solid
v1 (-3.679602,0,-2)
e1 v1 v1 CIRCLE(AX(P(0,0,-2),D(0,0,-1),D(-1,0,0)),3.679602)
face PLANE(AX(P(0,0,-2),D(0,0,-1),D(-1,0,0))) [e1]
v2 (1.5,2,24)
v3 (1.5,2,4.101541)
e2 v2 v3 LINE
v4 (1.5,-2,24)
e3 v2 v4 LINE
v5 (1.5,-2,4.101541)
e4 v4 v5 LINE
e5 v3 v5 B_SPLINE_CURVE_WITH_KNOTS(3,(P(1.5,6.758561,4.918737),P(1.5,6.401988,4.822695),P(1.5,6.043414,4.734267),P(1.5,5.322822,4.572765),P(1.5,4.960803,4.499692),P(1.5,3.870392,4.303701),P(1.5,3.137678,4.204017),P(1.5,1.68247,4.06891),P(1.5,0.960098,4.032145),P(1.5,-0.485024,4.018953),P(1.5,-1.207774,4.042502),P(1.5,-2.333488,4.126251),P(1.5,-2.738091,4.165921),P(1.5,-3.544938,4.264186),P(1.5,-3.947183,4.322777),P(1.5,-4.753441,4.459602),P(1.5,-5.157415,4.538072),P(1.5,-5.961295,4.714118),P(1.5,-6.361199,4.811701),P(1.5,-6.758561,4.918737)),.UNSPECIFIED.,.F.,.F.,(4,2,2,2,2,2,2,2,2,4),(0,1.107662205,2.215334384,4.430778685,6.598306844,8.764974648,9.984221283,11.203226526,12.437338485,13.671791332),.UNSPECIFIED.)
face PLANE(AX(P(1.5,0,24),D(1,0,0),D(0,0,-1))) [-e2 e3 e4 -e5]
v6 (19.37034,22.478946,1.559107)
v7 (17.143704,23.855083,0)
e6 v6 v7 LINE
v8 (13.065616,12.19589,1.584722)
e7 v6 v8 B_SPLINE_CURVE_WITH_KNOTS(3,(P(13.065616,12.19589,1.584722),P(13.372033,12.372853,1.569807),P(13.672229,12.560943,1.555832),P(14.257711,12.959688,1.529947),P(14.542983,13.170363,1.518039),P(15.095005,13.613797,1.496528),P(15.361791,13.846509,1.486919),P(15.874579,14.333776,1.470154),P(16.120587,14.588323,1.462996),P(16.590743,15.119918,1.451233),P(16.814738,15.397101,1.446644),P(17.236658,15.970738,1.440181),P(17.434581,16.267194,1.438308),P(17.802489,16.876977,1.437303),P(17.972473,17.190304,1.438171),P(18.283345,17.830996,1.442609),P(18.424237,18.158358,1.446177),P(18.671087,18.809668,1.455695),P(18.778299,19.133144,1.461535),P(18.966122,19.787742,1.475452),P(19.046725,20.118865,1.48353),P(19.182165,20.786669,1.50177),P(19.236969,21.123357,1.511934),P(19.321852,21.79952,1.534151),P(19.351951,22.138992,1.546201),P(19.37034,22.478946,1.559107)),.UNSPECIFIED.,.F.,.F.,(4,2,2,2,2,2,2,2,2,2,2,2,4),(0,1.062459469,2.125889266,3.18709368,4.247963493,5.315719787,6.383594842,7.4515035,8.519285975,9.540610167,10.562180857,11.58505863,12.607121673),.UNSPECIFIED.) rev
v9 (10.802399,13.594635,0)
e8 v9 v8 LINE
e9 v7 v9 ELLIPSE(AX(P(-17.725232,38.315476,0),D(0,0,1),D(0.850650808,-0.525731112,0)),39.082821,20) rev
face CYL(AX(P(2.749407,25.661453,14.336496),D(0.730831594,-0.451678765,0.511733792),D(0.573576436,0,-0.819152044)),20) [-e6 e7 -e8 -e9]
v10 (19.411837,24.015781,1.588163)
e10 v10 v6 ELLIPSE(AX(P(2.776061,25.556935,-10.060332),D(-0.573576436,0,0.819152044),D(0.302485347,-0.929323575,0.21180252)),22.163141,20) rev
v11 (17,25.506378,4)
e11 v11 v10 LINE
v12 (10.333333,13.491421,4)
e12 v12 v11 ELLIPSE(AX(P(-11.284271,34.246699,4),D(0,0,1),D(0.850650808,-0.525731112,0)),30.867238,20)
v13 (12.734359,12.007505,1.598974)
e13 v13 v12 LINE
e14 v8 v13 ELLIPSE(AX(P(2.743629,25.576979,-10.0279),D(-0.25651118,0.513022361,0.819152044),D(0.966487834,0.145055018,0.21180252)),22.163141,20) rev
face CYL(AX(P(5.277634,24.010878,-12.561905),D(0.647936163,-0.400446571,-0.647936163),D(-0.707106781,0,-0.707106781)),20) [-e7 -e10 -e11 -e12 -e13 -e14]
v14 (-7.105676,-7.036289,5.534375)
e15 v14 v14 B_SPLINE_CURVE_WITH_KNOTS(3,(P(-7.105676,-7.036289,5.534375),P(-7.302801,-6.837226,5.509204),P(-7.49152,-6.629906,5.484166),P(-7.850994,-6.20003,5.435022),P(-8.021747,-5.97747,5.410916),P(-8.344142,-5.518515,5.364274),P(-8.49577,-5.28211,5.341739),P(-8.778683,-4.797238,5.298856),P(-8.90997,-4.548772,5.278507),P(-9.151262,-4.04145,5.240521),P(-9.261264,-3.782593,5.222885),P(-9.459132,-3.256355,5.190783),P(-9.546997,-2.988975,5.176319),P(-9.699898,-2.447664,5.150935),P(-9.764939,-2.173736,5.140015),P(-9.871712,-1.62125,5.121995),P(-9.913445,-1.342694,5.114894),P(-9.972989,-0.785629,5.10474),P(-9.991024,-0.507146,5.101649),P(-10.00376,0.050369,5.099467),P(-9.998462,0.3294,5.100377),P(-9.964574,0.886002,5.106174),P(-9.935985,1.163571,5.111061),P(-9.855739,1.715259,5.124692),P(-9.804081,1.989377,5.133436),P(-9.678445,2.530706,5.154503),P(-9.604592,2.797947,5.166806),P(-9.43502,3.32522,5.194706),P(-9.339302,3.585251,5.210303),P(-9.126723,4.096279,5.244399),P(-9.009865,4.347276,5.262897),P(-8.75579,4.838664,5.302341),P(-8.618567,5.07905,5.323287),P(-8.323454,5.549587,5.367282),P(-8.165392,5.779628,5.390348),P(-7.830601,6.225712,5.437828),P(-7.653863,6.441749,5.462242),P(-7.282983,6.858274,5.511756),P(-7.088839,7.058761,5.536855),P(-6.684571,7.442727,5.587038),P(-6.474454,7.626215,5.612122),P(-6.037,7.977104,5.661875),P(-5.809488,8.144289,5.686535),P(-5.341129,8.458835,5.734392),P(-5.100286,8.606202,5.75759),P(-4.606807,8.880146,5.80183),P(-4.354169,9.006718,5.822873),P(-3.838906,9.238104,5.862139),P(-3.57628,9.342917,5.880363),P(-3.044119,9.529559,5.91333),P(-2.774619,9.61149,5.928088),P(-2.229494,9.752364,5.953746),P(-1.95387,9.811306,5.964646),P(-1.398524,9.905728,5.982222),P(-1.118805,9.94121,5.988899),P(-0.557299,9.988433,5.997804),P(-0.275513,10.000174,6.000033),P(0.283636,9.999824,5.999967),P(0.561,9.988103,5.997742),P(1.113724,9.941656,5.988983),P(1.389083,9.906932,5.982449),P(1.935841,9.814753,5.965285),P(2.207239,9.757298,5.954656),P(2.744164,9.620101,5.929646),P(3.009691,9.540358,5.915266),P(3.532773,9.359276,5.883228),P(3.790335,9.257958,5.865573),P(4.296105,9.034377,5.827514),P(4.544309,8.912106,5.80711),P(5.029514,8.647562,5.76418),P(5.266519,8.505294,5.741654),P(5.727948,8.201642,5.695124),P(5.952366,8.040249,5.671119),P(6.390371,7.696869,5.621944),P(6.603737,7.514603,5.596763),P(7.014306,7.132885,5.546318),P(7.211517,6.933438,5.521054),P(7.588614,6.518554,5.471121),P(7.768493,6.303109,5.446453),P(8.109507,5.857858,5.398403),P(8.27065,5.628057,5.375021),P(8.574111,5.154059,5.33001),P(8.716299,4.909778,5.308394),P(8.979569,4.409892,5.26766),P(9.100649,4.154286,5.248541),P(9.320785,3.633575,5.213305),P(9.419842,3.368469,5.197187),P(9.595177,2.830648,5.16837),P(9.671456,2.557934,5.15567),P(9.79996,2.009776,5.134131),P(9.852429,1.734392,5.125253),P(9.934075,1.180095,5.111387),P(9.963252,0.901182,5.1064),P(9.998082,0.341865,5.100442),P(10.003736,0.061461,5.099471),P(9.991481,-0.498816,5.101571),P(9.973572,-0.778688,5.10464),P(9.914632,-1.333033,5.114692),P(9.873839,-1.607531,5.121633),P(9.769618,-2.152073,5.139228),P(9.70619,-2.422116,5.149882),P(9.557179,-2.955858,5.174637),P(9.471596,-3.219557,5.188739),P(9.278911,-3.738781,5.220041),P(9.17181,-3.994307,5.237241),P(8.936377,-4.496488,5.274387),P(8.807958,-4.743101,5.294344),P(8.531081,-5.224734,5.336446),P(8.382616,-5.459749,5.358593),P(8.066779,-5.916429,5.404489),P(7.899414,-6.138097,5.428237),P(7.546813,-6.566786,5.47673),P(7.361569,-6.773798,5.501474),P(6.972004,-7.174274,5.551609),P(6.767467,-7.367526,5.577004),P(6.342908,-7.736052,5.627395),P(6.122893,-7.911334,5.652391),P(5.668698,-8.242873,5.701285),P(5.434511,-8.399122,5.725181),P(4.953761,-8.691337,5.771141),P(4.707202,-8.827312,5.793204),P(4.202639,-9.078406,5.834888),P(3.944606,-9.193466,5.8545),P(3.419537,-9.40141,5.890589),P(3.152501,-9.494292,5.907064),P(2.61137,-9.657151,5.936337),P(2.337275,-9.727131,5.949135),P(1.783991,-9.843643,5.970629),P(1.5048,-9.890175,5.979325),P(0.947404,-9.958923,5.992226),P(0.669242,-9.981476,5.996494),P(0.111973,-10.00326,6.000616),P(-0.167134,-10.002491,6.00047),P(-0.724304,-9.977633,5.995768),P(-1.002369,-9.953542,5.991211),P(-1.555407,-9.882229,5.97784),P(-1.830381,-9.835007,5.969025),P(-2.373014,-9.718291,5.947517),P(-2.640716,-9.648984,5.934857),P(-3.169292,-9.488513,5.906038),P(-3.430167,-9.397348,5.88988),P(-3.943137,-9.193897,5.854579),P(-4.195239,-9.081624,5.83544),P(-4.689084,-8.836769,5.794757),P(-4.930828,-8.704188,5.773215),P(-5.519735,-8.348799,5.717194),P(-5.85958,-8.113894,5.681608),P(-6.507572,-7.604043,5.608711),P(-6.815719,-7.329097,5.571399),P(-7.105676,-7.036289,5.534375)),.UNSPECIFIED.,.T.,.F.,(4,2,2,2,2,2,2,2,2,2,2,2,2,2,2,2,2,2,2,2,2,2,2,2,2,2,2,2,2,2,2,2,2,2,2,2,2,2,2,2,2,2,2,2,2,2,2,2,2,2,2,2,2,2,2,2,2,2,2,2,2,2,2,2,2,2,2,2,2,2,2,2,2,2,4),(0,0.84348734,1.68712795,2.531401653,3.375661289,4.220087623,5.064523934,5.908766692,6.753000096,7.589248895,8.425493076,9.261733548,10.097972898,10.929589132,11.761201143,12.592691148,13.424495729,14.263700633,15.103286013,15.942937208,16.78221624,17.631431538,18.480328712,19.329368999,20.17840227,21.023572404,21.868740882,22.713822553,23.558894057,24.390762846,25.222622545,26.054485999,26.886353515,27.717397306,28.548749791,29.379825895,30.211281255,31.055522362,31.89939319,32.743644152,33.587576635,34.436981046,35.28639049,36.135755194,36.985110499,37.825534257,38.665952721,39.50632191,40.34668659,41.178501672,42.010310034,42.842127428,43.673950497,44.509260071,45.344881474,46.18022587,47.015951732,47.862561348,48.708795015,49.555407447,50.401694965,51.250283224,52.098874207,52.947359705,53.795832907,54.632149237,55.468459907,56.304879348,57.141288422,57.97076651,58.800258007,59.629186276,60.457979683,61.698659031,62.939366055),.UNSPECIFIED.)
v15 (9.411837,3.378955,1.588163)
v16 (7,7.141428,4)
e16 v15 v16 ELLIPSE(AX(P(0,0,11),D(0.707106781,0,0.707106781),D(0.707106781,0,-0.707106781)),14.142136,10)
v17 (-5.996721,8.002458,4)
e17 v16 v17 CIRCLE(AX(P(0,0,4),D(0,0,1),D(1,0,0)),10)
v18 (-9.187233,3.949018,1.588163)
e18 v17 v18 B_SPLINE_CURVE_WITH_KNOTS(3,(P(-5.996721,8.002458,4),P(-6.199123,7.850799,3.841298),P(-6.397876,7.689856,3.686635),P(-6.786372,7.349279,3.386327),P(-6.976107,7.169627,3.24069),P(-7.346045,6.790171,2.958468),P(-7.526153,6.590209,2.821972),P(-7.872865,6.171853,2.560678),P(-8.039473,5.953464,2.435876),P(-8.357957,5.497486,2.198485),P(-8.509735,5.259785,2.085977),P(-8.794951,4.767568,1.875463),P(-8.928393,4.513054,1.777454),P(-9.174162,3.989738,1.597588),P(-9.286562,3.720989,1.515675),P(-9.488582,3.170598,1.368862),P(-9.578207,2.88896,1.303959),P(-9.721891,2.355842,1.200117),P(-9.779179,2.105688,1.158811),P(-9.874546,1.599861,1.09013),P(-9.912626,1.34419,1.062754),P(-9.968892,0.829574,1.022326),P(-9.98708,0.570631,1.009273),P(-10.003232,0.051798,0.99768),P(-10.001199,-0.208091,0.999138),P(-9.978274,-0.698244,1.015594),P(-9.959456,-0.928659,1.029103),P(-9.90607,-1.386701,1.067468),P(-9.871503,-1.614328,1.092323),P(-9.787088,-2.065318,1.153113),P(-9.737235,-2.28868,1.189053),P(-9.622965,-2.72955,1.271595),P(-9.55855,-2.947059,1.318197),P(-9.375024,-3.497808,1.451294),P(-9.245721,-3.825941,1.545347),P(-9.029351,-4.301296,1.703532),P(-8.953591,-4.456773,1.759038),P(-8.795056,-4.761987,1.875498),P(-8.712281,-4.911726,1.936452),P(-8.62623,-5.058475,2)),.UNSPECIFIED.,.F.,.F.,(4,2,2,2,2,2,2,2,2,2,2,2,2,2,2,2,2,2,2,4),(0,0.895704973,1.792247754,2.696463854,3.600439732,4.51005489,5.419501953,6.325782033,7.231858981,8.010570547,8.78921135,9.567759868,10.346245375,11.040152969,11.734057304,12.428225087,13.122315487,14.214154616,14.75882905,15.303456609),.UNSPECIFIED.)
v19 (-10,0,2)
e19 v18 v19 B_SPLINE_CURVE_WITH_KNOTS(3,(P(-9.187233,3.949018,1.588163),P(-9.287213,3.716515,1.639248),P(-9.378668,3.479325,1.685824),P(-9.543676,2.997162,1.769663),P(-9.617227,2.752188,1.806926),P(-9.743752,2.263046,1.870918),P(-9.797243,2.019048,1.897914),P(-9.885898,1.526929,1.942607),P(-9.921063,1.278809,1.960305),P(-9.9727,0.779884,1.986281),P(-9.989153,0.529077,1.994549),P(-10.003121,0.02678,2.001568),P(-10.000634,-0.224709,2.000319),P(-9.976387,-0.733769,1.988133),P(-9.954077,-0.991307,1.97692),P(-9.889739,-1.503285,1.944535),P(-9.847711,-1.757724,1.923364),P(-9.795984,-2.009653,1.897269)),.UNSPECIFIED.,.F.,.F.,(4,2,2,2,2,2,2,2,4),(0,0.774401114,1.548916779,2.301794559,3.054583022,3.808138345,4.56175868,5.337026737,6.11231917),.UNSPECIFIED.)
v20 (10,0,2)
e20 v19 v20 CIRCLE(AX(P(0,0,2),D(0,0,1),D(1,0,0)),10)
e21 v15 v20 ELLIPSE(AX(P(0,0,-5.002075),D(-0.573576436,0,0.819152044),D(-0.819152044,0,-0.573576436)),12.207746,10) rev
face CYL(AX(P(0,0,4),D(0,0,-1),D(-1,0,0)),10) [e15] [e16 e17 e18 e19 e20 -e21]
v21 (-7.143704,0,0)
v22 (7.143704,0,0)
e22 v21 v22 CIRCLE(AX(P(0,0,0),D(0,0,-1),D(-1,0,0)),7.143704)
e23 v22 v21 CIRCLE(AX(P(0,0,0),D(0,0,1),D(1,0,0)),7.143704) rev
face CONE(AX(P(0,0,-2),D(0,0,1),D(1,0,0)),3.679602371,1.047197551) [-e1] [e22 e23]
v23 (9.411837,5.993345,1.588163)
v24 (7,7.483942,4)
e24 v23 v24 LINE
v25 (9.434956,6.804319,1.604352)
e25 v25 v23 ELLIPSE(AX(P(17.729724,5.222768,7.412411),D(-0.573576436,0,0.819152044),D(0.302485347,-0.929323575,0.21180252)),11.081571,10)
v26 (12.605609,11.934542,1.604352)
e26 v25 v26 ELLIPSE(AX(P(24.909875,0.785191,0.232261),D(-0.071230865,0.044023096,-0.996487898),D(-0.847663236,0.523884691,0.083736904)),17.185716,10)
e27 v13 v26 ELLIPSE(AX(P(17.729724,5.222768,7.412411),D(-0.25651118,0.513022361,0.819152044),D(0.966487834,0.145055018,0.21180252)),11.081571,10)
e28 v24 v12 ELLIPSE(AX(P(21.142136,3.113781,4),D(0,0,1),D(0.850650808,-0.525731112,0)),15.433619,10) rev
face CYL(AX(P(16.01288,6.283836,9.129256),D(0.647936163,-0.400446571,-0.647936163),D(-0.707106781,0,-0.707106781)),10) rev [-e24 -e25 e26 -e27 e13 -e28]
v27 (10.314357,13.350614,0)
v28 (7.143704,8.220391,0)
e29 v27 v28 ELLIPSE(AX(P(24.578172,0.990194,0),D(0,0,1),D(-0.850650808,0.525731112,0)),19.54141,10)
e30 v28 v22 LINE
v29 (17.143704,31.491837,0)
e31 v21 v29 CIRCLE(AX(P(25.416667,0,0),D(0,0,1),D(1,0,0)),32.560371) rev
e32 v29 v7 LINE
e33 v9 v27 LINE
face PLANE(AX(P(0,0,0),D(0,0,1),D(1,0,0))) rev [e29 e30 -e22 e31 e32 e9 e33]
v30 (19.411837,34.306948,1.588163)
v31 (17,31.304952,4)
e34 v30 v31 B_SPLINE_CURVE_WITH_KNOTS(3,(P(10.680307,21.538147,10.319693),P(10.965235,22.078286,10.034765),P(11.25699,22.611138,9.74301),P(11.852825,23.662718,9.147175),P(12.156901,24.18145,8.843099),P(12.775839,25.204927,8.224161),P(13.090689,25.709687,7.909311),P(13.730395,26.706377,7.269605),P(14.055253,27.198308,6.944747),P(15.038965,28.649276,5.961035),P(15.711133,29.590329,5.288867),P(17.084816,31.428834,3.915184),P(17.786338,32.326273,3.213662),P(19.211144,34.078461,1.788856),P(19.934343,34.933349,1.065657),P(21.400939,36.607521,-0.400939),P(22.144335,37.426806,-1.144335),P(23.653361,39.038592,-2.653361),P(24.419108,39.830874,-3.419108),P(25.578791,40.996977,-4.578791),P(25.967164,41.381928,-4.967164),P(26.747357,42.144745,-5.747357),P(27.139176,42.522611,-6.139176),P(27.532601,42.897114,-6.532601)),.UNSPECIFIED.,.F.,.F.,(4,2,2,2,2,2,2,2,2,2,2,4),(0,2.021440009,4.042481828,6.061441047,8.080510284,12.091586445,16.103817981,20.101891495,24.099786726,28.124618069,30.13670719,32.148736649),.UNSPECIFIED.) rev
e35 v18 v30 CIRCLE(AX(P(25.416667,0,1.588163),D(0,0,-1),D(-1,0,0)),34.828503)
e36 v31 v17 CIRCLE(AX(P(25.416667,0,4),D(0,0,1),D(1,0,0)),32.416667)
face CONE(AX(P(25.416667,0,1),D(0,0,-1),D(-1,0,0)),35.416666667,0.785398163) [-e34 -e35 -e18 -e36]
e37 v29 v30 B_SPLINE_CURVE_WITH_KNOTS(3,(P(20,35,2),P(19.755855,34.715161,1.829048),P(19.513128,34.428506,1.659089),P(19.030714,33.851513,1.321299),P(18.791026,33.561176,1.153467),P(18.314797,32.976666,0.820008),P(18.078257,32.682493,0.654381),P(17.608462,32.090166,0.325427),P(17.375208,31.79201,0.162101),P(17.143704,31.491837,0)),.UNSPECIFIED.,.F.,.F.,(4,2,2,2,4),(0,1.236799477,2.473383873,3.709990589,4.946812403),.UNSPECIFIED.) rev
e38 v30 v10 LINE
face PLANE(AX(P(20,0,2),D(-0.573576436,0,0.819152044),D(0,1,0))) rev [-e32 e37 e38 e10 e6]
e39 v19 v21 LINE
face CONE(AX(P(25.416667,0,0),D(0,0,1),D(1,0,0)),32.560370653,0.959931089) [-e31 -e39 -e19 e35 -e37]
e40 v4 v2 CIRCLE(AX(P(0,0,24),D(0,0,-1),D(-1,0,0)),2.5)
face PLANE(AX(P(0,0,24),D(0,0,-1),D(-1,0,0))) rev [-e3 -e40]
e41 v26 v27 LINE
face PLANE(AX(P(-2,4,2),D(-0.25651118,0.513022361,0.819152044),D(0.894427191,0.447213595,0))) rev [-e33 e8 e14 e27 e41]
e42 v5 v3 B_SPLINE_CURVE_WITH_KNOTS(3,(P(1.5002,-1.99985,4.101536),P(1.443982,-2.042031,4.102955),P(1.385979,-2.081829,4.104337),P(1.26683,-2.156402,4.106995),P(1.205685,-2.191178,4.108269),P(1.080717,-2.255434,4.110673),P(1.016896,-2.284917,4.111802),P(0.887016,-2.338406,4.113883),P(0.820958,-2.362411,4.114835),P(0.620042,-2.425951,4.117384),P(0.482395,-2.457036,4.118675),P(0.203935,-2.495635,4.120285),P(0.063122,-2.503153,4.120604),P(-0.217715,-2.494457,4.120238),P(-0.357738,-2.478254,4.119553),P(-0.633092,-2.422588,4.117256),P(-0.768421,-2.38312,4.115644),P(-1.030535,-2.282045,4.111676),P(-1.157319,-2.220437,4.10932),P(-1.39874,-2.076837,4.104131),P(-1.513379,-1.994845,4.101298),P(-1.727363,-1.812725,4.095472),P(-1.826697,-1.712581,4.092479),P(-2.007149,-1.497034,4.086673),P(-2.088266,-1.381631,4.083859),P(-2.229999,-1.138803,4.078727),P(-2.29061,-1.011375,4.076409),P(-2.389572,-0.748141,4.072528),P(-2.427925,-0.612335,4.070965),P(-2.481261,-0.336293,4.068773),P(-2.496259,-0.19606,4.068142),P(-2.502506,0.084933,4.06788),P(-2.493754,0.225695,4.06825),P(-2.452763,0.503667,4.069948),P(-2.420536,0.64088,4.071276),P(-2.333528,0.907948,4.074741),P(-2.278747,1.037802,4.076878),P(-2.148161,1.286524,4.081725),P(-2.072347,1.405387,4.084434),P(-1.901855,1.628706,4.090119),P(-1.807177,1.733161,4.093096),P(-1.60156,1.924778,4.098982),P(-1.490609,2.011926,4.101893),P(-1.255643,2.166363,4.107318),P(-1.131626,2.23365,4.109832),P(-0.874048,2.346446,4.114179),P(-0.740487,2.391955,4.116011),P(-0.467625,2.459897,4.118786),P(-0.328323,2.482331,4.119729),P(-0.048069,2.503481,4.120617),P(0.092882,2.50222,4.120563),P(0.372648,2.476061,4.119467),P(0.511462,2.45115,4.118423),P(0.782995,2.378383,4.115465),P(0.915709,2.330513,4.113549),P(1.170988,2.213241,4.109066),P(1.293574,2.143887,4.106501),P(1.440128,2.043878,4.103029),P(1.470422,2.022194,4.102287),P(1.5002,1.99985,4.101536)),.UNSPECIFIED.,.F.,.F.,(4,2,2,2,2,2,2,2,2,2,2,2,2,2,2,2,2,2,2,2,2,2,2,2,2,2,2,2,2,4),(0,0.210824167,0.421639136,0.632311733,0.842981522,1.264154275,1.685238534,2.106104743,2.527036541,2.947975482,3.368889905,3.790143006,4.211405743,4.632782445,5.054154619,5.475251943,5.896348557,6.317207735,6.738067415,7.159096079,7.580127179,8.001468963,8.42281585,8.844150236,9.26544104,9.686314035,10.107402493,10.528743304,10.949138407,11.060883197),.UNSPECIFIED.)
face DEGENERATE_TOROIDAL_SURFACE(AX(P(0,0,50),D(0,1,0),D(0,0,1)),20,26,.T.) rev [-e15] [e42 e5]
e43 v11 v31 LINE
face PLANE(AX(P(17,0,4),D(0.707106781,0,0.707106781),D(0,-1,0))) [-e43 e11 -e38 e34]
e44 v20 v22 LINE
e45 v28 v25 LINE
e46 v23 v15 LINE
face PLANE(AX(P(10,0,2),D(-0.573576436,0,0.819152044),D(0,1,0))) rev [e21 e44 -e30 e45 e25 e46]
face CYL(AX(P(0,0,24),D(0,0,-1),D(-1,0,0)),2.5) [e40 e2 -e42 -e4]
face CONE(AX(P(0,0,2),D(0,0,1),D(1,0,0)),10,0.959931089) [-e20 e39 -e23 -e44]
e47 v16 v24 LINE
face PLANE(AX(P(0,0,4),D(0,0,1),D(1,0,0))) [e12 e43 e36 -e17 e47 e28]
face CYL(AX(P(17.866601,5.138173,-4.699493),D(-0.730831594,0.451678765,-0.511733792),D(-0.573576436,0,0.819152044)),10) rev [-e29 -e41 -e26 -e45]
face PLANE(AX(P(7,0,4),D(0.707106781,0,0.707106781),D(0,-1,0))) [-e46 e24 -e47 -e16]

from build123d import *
from OCP.BRepFilletAPI import BRepFilletAPI_MakeChamfer
from build123d.topology import SkipClean

# Parameters (mm, degrees)
SKETCH1_R           = 10
BOSS_EXTRUDE1_DEPTH = 4
CHAMFER1_SIZE       = 2
CHAMFER1_SIZE2      = 2.856296013
SKETCH3_R           = 10
BOSS_EXTRUDE2_DEPTH = 2
CHAMFER2_SIZE       = 3
BOSS_EXTRUDE3_DEPTH = 24
SKETCH6_R           = 7.143703987
BOSS_EXTRUDE4_DEPTH = 2
CHAMFER3_SIZE2      = 3.464101615
CHAMFER3_SIZE       = 2
FILLET1_R           = 10
FILLET2_R           = 20


# Some blends are built 0.0001 mm under size
with BuildPart() as part:
    # Sketch1 → Boss-Extrude1 (new body)
    with BuildSketch(Plane.XY):
        with BuildLine():
            ThreePointArc((-10, 0), (0, 10), (10, 0))
            Line((10, 0), (10, 10))
            Line((10, 10), (20, 15))
            Line((20, 15), (20, 35))
            ThreePointArc((20, 35), (-1.473671334, 23.048861143), (-10, 0))
        make_face()
        Circle(SKETCH1_R)
    extrude(amount=BOSS_EXTRUDE1_DEPTH)

    # Chamfer1: one chamfer whose edges measure the first distance from different faces: ONE call of the kernel's chamfer builder (chamfer() names one face for all edges)
    chamfer1_edges_1 = [part.edges().sort_by_distance(p)[0] for p in [
        (20, 25, 0),
    ]]
    chamfer1_side_1 = [part.faces().sort_by_distance(p)[0] for p in [
        (20, 25, 2),
    ]]
    chamfer1_edges_2 = [part.edges().sort_by_distance(p)[0] for p in [
        (15, 12.5, 0),
    ]]
    chamfer1_side_2 = [part.faces().sort_by_distance(p)[0] for p in [
        (15, 12.5, 2),
    ]]
    chamfer1_edges_3 = [part.edges().sort_by_distance(p)[0] for p in [
        (10, 5, 0),
    ]]
    chamfer1_side_3 = [part.faces().sort_by_distance(p)[0] for p in [
        (10, 5, 2),
    ]]
    chamfer1_edges_4 = [part.edges().sort_by_distance(p)[0] for p in [
        (0, -10, 0),
    ]]
    chamfer1_side_4 = [part.faces().sort_by_distance(p)[0] for p in [
        (0, -10, 2),
    ]]
    chamfer1_edges_5 = [part.edges().sort_by_distance(p)[0] for p in [
        (-1.473671334, 23.048861143, 0),
    ]]
    chamfer1_side_5 = [part.faces().sort_by_distance(p)[0] for p in [
        (-1.473671334, 23.048861143, 2),
    ]]
    chamfer1 = BRepFilletAPI_MakeChamfer(part.part.solid().wrapped)
    for e in chamfer1_edges_1:
        chamfer1.Add(CHAMFER1_SIZE, CHAMFER1_SIZE2, e.wrapped, chamfer1_side_1[0].wrapped)  # the first distance lies on this face
    for e in chamfer1_edges_2:
        chamfer1.Add(CHAMFER1_SIZE, CHAMFER1_SIZE2, e.wrapped, chamfer1_side_2[0].wrapped)  # the first distance lies on this face
    for e in chamfer1_edges_3:
        chamfer1.Add(CHAMFER1_SIZE, CHAMFER1_SIZE2, e.wrapped, chamfer1_side_3[0].wrapped)  # the first distance lies on this face
    for e in chamfer1_edges_4:
        chamfer1.Add(CHAMFER1_SIZE, CHAMFER1_SIZE2, e.wrapped, chamfer1_side_4[0].wrapped)  # the first distance lies on this face
    for e in chamfer1_edges_5:
        chamfer1.Add(CHAMFER1_SIZE, CHAMFER1_SIZE2, e.wrapped, chamfer1_side_5[0].wrapped)  # the first distance lies on this face
    add(Compound.cast(chamfer1.Shape()), mode=Mode.REPLACE)

    # Sketch3 → Boss-Extrude2 (add)
    with BuildSketch(Plane.XY.offset(4)):
        Circle(SKETCH3_R)
    extrude(amount=BOSS_EXTRUDE2_DEPTH)

    # Sketch4 → Cut-Revolve2 (revolve, cut)
    with SkipClean():  # the faces are left unmerged after this step: merging them gives an invalid solid
        with BuildSketch(Plane(origin=(0, 0, 0), x_dir=(0, 0, -1), z_dir=(1, 0, 0))):
            with BuildLine():
                Line((-50, 16.613247726), (-50, -16.613247726))
                ThreePointArc((-50, -16.613247726), (-4, 0), (-50, 16.613247726))
            make_face()
        revolve(axis=Axis((0, 16.613247726, 50), (0, -1, 0)), mode=Mode.SUBTRACT)

    # Chamfer2
    # the kernel refuses this chamfer: 3 mm, written as the material it takes off along each edge
    with BuildSketch(Plane(origin=(10, -7.715048964, 4), x_dir=(0, 0, -1), z_dir=(0, 1, 0))) as chamfer2_piece_1_section:
        Polygon((CHAMFER2_SIZE, 0), (0, CHAMFER2_SIZE), (0, 0), align=None)
    chamfer2_piece_1 = extrude(amount=25.430097928, mode=Mode.PRIVATE)
    chamfer2_piece_1 = chamfer2_piece_1 - Plane(origin=(0, 0, 4), x_dir=(1, 0, 0), z_dir=(0, 0, -1)) * Cylinder(10, 63, mode=Mode.PRIVATE)
    chamfer2_piece_1 = split(chamfer2_piece_1, bisect_by=Plane(origin=(5.786169814, 0.712611408, -5.422410742), z_dir=(0.316227766016838, -0.6324555320336757, 0.7071067811865477)), keep=Keep.TOP, mode=Mode.PRIVATE)
    add(chamfer2_piece_1, mode=Mode.SUBTRACT)
    with BuildSketch(Plane(origin=(3.099450427, 6.549725213, 4), x_dir=(-0.4472135954999581, 0.8944271909999159, 0), z_dir=(0.8944271909999159, 0.4472135954999581, 0))) as chamfer2_piece_2_section:
        Polygon((CHAMFER2_SIZE, 0), (0, -CHAMFER2_SIZE), (0, 0), align=None)
    chamfer2_piece_2 = extrude(amount=26.610437815, mode=Mode.PRIVATE)
    chamfer2_piece_2 = split(chamfer2_piece_2, bisect_by=Plane(origin=(5.049725213, 6.549725213, 5.950274787), z_dir=(0.7071067811865476, 0, 0.7071067811865476)), keep=Keep.TOP, mode=Mode.PRIVATE)
    add(chamfer2_piece_2, mode=Mode.SUBTRACT)
    with BuildSketch(Plane(origin=(20, 7.284951036, 4), x_dir=(-1, 0, 0), z_dir=(0, 1, 0))) as chamfer2_piece_3:
        Polygon((CHAMFER2_SIZE, 0), (0, -CHAMFER2_SIZE), (0, 0), align=None)
    extrude(amount=35.430097928, mode=Mode.SUBTRACT)
    with BuildSketch(Plane(origin=(25.416666667, 0, 4), x_dir=(0.06431969440635008, 0.9979293446489453, 0), z_dir=(0.9979293446489453, -0.06431969440635008, 0))) as chamfer2_piece_4_section:
        Polygon((35.416666667 - CHAMFER2_SIZE, 0), (35.416666667, -CHAMFER2_SIZE), (35.416666667, 0), align=None)
    chamfer2_piece_4 = revolve(axis=Axis((25.416666667, 0, 4), (0, 0, 1)), revolution_arc=114.912638668, mode=Mode.PRIVATE)
    chamfer2_piece_4 = chamfer2_piece_4 - Plane(origin=(0, 0, 4), x_dir=(1, 0, 0), z_dir=(0, 0, -1)) * Cylinder(10, 142, mode=Mode.PRIVATE)
    add(chamfer2_piece_4, mode=Mode.SUBTRACT)

    # Sketch5 → Boss-Extrude3 (add)
    with BuildSketch(Plane(origin=(0, 0, 0), x_dir=(-1, 0, 0), z_dir=(0, 0, -1))):
        with BuildLine():
            ThreePointArc((2.5, 0), (1.118033989, 2.236067977), (-1.5, 2))
            Line((-1.5, 2), (-1.5, -2))
            ThreePointArc((-1.5, -2), (1.118033989, -2.236067977), (2.5, 0))
        make_face()
    extrude(amount=-BOSS_EXTRUDE3_DEPTH)

    # Sketch6 → Boss-Extrude4 (add)
    with BuildSketch(Plane(origin=(0, 0, 0), x_dir=(-1, 0, 0), z_dir=(0, 0, -1))):
        Circle(SKETCH6_R)
    extrude(amount=BOSS_EXTRUDE4_DEPTH)

    # Chamfer3
    chamfer3_edges = [part.edges().sort_by_distance(p)[0] for p in [
        (7.143703987, 0, -2),
    ]]
    chamfer3_side = [part.faces().sort_by_distance(p)[0] for p in [
        (7.143703987, 0, -1.96),
    ]]
    chamfer(chamfer3_edges, length=CHAMFER3_SIZE - 0.0001, length2=CHAMFER3_SIZE2 - 0.0001, reference=chamfer3_side[0])  # a hair under: the kernel refuses the full size

    # Fillet1
    # the kernel refuses this fillet: 10 mm, written as the material it adds along each edge
    with BuildSketch(Plane(origin=(15.19031869, 6.792206637, 5.634300272), x_dir=(-0.36999358405013405, -0.8921806391504057, -0.25907229664113096), z_dir=(-0.7308315944351151, 0.4516787654131792, -0.5117337915852868))) as fillet1_piece_1_section:
        with BuildLine():
            CenterArc((FILLET1_R * 0.316268876392, -FILLET1_R), FILLET1_R, 90, 35.101083815)
            Line((-FILLET1_R * 0.258751851785, -FILLET1_R * 0.181861159602), (0, 0))
            Line((0, 0), (FILLET1_R * 0.316268876392, 0))
        make_face()
    fillet1_piece_1 = extrude(amount=18.916939263, mode=Mode.PRIVATE)
    fillet1_piece_1 = split(fillet1_piece_1, bisect_by=Plane(origin=(10.278009209, 6.792206637, 0.721990791), z_dir=(0.7071067811865476, 0, 0.7071067811865476)), keep=Keep.TOP, mode=Mode.PRIVATE)
    fillet1_piece_1 = split(fillet1_piece_1, bisect_by=Plane(origin=(12.993467105, 11.185909808, 0.721990791), z_dir=(-0.31622776601683794, 0.6324555320336759, -0.7071067811865477)), keep=Keep.TOP, mode=Mode.PRIVATE)
    add(fillet1_piece_1)
    with BuildSketch(Plane(origin=(15.19031869, 6.792206637, 5.634300272), x_dir=(-0.36999358405013405, -0.8921806391504057, -0.25907229664113096), z_dir=(-0.7308315944351151, 0.4516787654131792, -0.5117337915852868))) as fillet1_piece_2_section:
        with BuildLine():
            CenterArc((FILLET1_R * 0.316268876392, -FILLET1_R), FILLET1_R, 90, 35.101083815)
            Line((-FILLET1_R * 0.258751851785, -FILLET1_R * 0.181861159602), (0, 0))
            Line((0, 0), (FILLET1_R * 0.316268876392, 0))
        make_face()
    fillet1_piece_2 = extrude(amount=18.916939263, mode=Mode.PRIVATE)
    fillet1_piece_2 = split(fillet1_piece_2, bisect_by=Plane(origin=(10.278009209, 6.792206637, 0.721990791), z_dir=(-0.7071067811865476, 0, -0.7071067811865476)), keep=Keep.TOP, mode=Mode.PRIVATE)
    fillet1_piece_2 = split(fillet1_piece_2, bisect_by=Plane(origin=(12.993467105, 11.185909808, 0.721990791), z_dir=(0.31622776601683794, -0.6324555320336759, 0.7071067811865477)), keep=Keep.TOP, mode=Mode.PRIVATE)
    add(fillet1_piece_2)
    with BuildSketch(Plane(origin=(15.19031869, 6.792206637, 5.634300272), x_dir=(-0.36999358405013405, -0.8921806391504057, -0.25907229664113096), z_dir=(-0.7308315944351151, 0.4516787654131792, -0.5117337915852868))) as fillet1_piece_3_section:
        with BuildLine():
            CenterArc((FILLET1_R * 0.316268876392, -FILLET1_R), FILLET1_R, 90, 35.101083815)
            Line((-FILLET1_R * 0.258751851785, -FILLET1_R * 0.181861159602), (0, 0))
            Line((0, 0), (FILLET1_R * 0.316268876392, 0))
        make_face()
    fillet1_piece_3 = extrude(amount=18.916939263, mode=Mode.PRIVATE)
    fillet1_piece_3 = split(fillet1_piece_3, bisect_by=Plane(origin=(15.19031869, 6.792206637, 0), z_dir=(0, 0, 1)), keep=Keep.TOP, mode=Mode.PRIVATE)
    fillet1_piece_3 = split(fillet1_piece_3, bisect_by=Plane(origin=(10.278009209, 6.792206637, 0.721990791), z_dir=(-0.7071067811865476, 0, -0.7071067811865476)), keep=Keep.TOP, mode=Mode.PRIVATE)
    fillet1_piece_3 = split(fillet1_piece_3, bisect_by=Plane(origin=(12.993467105, 11.185909808, 0.721990791), z_dir=(-0.31622776601683794, 0.6324555320336759, -0.7071067811865477)), keep=Keep.TOP, mode=Mode.PRIVATE)
    add(fillet1_piece_3)
    with BuildSketch(Plane(origin=(0.513404622, 15.863038381, 10.486595378), x_dir=(-0.28315848617955147, -0.9163201096827513, 0.283158486179551), z_dir=(0.6479361632942746, -0.40044657145615603, -0.6479361632942746))) as fillet1_piece_4_section:
        with BuildLine():
            CenterArc((FILLET1_R * 0.400446571456, -FILLET1_R), FILLET1_R, 90, 43.646927109)
            Line((-FILLET1_R * 0.289765861241, -FILLET1_R * 0.27639320225), (0, 0))
            Line((0, 0), (FILLET1_R * 0.400446571456, 0))
        make_face()
    fillet1_piece_4 = extrude(amount=23.744665195, mode=Mode.PRIVATE)
    fillet1_piece_4 = split(fillet1_piece_4, bisect_by=Plane(origin=(7.621794482, 15.863038381, 0.334762569), z_dir=(-0.5735764363510445, 0, 0.819152044288993)), keep=Keep.TOP, mode=Mode.PRIVATE)
    fillet1_piece_4 = split(fillet1_piece_4, bisect_by=Plane(origin=(3.692373209, 9.505101206, 0.334762569), z_dir=(-0.2565111803946036, 0.5130223607892069, 0.8191520442889928)), keep=Keep.TOP, mode=Mode.PRIVATE)
    fillet1_piece_4 = split(fillet1_piece_4, bisect_by=Plane(origin=(0.513404622, 15.863038381, 4), z_dir=(0, 0, -1)), keep=Keep.TOP, mode=Mode.PRIVATE)
    add(fillet1_piece_4)
    with BuildSketch(Plane(origin=(0.513404622, 15.863038381, 10.486595378), x_dir=(-0.28315848617955147, -0.9163201096827513, 0.283158486179551), z_dir=(0.6479361632942746, -0.40044657145615603, -0.6479361632942746))) as fillet1_piece_5_section:
        with BuildLine():
            CenterArc((FILLET1_R * 0.400446571456, -FILLET1_R), FILLET1_R, 90, 43.646927109)
            Line((-FILLET1_R * 0.289765861241, -FILLET1_R * 0.27639320225), (0, 0))
            Line((0, 0), (FILLET1_R * 0.400446571456, 0))
        make_face()
    fillet1_piece_5 = extrude(amount=23.744665195, mode=Mode.PRIVATE)
    fillet1_piece_5 = split(fillet1_piece_5, bisect_by=Plane(origin=(7.621794482, 15.863038381, 0.334762569), z_dir=(0.5735764363510445, 0, -0.819152044288993)), keep=Keep.TOP, mode=Mode.PRIVATE)
    fillet1_piece_5 = split(fillet1_piece_5, bisect_by=Plane(origin=(3.692373209, 9.505101206, 0.334762569), z_dir=(-0.2565111803946036, 0.5130223607892069, 0.8191520442889928)), keep=Keep.TOP, mode=Mode.PRIVATE)
    add(fillet1_piece_5)
    with BuildSketch(Plane(origin=(0.513404622, 15.863038381, 10.486595378), x_dir=(-0.28315848617955147, -0.9163201096827513, 0.283158486179551), z_dir=(0.6479361632942746, -0.40044657145615603, -0.6479361632942746))) as fillet1_piece_6_section:
        with BuildLine():
            CenterArc((FILLET1_R * 0.400446571456, -FILLET1_R), FILLET1_R, 90, 43.646927109)
            Line((-FILLET1_R * 0.289765861241, -FILLET1_R * 0.27639320225), (0, 0))
            Line((0, 0), (FILLET1_R * 0.400446571456, 0))
        make_face()
    fillet1_piece_6 = extrude(amount=23.744665195, mode=Mode.PRIVATE)
    fillet1_piece_6 = split(fillet1_piece_6, bisect_by=Plane(origin=(7.621794482, 15.863038381, 0.334762569), z_dir=(-0.5735764363510445, 0, 0.819152044288993)), keep=Keep.TOP, mode=Mode.PRIVATE)
    fillet1_piece_6 = split(fillet1_piece_6, bisect_by=Plane(origin=(3.692373209, 9.505101206, 0.334762569), z_dir=(0.2565111803946036, -0.5130223607892069, -0.8191520442889928)), keep=Keep.TOP, mode=Mode.PRIVATE)
    add(fillet1_piece_6)
    with BuildSketch(Plane(origin=(15.19031869, 6.792206637, 5.634300272), x_dir=(-0.36999358405013405, -0.8921806391504057, -0.25907229664113096), z_dir=(-0.7308315944351151, 0.4516787654131792, -0.5117337915852868))) as fillet1_piece_7a_section:
        with BuildLine():
            CenterArc((FILLET1_R * 0.316268876392, -FILLET1_R), FILLET1_R, 90, 35.101083815)
            Line((-FILLET1_R * 0.258751851785, -FILLET1_R * 0.181861159602), (0, 0))
            Line((0, 0), (FILLET1_R * 0.316268876392, 0))
        make_face()
    fillet1_piece_7a = extrude(amount=18.916939263, mode=Mode.PRIVATE)
    fillet1_piece_7a = split(fillet1_piece_7a, bisect_by=Plane(origin=(10.278009209, 6.792206637, 0.721990791), z_dir=(0.7071067811865476, 0, 0.7071067811865476)), keep=Keep.TOP, mode=Mode.PRIVATE)
    fillet1_piece_7a = split(fillet1_piece_7a, bisect_by=Plane(origin=(12.993467105, 11.185909808, 0.721990791), z_dir=(0.31622776601683794, -0.6324555320336759, 0.7071067811865477)), keep=Keep.TOP, mode=Mode.PRIVATE)
    with BuildSketch(Plane(origin=(0.513404622, 15.863038381, 10.486595378), x_dir=(-0.28315848617955147, -0.9163201096827513, 0.283158486179551), z_dir=(0.6479361632942746, -0.40044657145615603, -0.6479361632942746))) as fillet1_piece_7b_section:
        with BuildLine():
            CenterArc((FILLET1_R * 0.400446571456, -FILLET1_R), FILLET1_R, 90, 43.646927109)
            Line((-FILLET1_R * 0.289765861241, -FILLET1_R * 0.27639320225), (0, 0))
            Line((0, 0), (FILLET1_R * 0.400446571456, 0))
        make_face()
    fillet1_piece_7b = extrude(amount=23.744665195, mode=Mode.PRIVATE)
    fillet1_piece_7b = split(fillet1_piece_7b, bisect_by=Plane(origin=(7.621794482, 15.863038381, 0.334762569), z_dir=(0.5735764363510445, 0, -0.819152044288993)), keep=Keep.TOP, mode=Mode.PRIVATE)
    fillet1_piece_7b = split(fillet1_piece_7b, bisect_by=Plane(origin=(3.692373209, 9.505101206, 0.334762569), z_dir=(0.2565111803946036, -0.5130223607892069, -0.8191520442889928)), keep=Keep.TOP, mode=Mode.PRIVATE)
    fillet1_piece_7 = fillet1_piece_7a & fillet1_piece_7b
    add(fillet1_piece_7)

    # Fillet2
    # the kernel refuses this fillet: 20 mm, written as the material it takes off along each edge
    with BuildSketch(Plane(origin=(30.96880087, 8.220908247, 9.680437054), x_dir=(-0.6325244619050064, -0.7299276335395035, 0.2590722966416945), z_dir=(-0.7308315944351149, 0.4516787654131793, -0.5117337915852869))) as fillet2_piece_1:
        with BuildLine():
            CenterArc((FILLET2_R * 0.316268876392, FILLET2_R), FILLET2_R, 234.898916185, 35.101083815)
            Line((-FILLET2_R * 0.258751851784, FILLET2_R * 0.181861159603), (-FILLET2_R * 0.270252266348, FILLET2_R * 0.165498382795))
            Line((-FILLET2_R * 0.270252266348, FILLET2_R * 0.165498382795), (-FILLET2_R * 0.00632537752785, -FILLET2_R * 0.02))
            Line((-FILLET2_R * 0.00632537752785, -FILLET2_R * 0.02), (FILLET2_R * 0.316268876391, -FILLET2_R * 0.02))
            Line((FILLET2_R * 0.316268876391, -FILLET2_R * 0.02), (FILLET2_R * 0.316268876391, 0))
        make_face()
    extrude(amount=34.730383082, mode=Mode.SUBTRACT)
    with BuildSketch(Plane(origin=(32.254343694, 7.426399087, -11.254343694), x_dir=(0.28315848617949646, 0.9163201096827853, -0.2831584861794967), z_dir=(-0.6479361632942986, 0.40044657145607865, 0.6479361632942986))) as fillet2_piece_2:
        with BuildLine():
            CenterArc((7.92825461, 20), FILLET2_R, 229.844556223, 40.155443777)
            Line((-4.96901588, 4.714045208), (-6.258742929, 3.185449729))
            ThreePointArc((-6.258742929, 3.185449729), (-5.895951663, 2.859922194), (-1.380424865, -1.447213595))
            Line((-1.380424865, -1.447213595), (0, -2))
            Line((0, -2), (7.92825461, -2))
            Line((7.92825461, -2), (7.92825461, 0))
        make_face()
    extrude(amount=43.363609674, mode=Mode.SUBTRACT)


solid = part.part
